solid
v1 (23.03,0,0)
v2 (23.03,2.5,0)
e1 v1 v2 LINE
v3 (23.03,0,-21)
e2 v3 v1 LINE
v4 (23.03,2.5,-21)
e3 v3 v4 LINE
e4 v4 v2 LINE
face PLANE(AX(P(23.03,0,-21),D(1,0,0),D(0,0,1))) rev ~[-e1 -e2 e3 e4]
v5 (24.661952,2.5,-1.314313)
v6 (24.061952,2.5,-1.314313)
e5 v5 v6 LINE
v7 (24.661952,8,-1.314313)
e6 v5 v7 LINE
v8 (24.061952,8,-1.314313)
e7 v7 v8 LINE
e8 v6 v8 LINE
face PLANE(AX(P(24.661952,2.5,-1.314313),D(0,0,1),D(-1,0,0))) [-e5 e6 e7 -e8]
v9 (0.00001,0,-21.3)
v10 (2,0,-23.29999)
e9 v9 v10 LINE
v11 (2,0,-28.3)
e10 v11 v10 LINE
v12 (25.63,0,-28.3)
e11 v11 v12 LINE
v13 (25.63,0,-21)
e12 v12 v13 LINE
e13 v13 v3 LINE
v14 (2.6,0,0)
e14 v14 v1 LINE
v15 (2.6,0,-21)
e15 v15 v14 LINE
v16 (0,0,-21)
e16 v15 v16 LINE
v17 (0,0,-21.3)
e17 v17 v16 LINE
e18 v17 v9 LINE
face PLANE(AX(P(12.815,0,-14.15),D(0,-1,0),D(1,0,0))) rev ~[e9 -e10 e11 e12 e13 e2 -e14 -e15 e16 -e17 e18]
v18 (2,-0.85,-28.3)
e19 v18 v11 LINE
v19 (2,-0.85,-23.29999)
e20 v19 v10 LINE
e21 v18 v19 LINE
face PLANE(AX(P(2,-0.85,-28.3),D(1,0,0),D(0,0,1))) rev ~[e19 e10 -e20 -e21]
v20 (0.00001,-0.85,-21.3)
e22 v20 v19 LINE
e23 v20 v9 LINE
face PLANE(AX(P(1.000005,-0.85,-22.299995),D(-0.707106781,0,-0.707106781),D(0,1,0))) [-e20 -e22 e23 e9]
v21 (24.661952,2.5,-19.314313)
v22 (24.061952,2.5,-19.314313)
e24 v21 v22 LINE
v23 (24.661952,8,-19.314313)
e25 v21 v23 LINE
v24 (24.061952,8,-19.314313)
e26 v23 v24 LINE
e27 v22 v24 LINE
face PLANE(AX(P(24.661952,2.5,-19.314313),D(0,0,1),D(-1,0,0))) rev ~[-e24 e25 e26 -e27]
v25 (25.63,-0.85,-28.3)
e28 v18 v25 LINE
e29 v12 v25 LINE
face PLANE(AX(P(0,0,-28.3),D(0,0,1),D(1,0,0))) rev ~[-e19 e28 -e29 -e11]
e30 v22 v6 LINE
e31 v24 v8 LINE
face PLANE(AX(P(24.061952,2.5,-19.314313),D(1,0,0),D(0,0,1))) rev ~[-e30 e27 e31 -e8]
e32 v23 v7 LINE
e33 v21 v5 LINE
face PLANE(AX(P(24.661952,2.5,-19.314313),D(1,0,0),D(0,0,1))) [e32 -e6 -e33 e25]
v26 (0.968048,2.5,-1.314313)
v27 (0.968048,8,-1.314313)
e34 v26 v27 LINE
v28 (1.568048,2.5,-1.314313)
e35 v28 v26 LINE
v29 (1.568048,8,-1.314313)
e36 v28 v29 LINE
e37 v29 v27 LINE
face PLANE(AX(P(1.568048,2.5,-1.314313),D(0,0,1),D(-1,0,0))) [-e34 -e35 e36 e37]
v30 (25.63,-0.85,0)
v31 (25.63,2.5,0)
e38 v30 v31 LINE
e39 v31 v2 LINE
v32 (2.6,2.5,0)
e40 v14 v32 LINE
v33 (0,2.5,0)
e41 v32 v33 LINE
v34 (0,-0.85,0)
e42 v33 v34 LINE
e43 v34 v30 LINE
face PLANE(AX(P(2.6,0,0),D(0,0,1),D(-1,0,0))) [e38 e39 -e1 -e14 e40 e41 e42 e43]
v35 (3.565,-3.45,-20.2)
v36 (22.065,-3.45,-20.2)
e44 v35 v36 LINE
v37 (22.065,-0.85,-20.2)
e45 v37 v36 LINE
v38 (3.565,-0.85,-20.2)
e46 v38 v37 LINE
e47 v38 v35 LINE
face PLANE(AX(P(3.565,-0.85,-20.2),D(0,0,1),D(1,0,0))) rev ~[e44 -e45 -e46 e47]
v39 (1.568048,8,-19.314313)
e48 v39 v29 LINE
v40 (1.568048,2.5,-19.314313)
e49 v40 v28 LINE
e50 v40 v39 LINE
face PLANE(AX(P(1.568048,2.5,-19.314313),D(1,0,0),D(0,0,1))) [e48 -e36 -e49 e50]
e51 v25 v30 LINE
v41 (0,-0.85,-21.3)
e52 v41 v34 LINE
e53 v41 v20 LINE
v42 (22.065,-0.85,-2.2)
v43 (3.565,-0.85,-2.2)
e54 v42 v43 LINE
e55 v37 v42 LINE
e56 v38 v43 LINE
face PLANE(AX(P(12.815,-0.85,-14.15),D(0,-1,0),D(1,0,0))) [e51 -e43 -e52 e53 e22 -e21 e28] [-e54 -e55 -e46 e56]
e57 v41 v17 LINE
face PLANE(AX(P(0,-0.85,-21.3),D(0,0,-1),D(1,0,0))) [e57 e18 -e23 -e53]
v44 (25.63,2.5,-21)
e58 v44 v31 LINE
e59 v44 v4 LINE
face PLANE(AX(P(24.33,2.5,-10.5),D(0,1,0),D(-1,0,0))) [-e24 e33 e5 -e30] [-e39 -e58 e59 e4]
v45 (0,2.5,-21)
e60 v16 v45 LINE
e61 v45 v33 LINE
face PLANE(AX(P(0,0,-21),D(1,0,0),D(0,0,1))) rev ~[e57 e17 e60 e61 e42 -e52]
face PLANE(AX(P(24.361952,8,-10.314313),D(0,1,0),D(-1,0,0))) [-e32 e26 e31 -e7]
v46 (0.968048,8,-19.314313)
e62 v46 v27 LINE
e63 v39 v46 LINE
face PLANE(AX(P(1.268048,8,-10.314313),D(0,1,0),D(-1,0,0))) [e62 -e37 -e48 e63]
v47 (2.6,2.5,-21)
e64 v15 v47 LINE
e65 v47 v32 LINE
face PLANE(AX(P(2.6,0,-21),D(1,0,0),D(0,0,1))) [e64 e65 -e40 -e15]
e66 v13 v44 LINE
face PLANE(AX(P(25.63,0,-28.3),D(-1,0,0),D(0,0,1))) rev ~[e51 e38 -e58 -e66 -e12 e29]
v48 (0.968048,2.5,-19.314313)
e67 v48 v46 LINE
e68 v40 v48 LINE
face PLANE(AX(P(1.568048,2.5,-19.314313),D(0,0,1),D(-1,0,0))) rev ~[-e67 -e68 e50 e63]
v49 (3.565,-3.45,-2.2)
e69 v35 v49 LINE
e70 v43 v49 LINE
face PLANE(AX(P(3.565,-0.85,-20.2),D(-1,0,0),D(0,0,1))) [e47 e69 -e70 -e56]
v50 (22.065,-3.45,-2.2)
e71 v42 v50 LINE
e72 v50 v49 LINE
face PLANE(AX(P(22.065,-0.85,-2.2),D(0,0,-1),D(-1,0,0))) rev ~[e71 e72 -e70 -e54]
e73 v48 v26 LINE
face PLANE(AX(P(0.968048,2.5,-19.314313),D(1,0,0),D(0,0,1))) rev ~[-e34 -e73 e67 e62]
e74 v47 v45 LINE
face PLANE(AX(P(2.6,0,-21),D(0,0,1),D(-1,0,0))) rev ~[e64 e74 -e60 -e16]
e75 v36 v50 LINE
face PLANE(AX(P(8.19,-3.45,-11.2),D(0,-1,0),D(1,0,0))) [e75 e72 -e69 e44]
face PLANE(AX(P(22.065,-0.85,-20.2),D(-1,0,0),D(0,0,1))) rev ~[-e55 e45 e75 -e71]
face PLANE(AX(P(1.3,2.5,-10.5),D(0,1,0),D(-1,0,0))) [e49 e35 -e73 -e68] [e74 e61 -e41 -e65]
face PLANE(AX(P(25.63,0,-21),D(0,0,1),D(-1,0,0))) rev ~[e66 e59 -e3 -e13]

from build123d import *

# Parameters (mm, degrees)
F0_W      = 25.63
F0_H      = 28.3
F1_DEPTH  = 0.85
F2_W      = 9.25
F2_H      = 18
F3_DEPTH  = 2.6
F4_W      = 2
F4_H      = 7
F5_DEPTH  = 25
F6_SIZE   = 1.99999
F7_W      = 2.6
F7_H      = 21
F8_DEPTH  = 2.5
F9_W      = 0.6
F9_H      = 18
F10_DEPTH = 5.5


# Not quite as in the source:
# - a fillet or chamfer is up to 0.001 mm smaller than in the source, because OpenCascade refuses the exact size


with BuildPart() as f1:
    # F0 (on Front) → F1 (new body)
    with BuildSketch(Plane.XZ):
        with Locations((12.815, -14.15)):
            Rectangle(F0_W, F0_H)
    extrude(amount=F1_DEPTH)

    # F2 (on face) → F3 (join)
    with BuildSketch(Plane.XZ.offset(0.85)):
        with Locations((8.19, -11.2)):
            Rectangle(F2_W, F2_H)
        with Locations((17.44, -11.2)):
            Rectangle(F2_W, F2_H)
    extrude(amount=F3_DEPTH)

    # F4 (on face) → F5 (cut)
    with BuildSketch(Plane.XZ.offset(0.85)):
        with Locations((1, -24.8)):
            Rectangle(F4_W, F4_H)
    extrude(amount=-F5_DEPTH, mode=Mode.SUBTRACT)

    # F6 (size 2 in the source; OpenCascade refuses exactly that, so slightly less here)
    f6_edges = [f1.edges().sort_by_distance(p)[0] for p in [
        (2, -0.425, -21.3),
    ]]
    chamfer(f6_edges, length=F6_SIZE)

    # F7 (on face) → F8 (join)
    with BuildSketch(Plane(origin=(0, 0, 0), x_dir=(-1, 0, 0), z_dir=(0, 1, 0))):
        with Locations((-1.3, -10.5)):
            Rectangle(F7_W, F7_H)
        with Locations((-24.33, -10.5)):
            Rectangle(F7_W, F7_H)
    extrude(amount=F8_DEPTH)

    # F9 (on face) → F10 (join)
    with BuildSketch(Plane(origin=(0, 2.5, 0), x_dir=(-1, 0, 0), z_dir=(0, 1, 0))):
        with Locations((-1.2680477372, -10.3143126089)):
            Rectangle(F9_W, F9_H)
        with Locations((-24.3619522628, -10.3143126089)):
            Rectangle(F9_W, F9_H)
    extrude(amount=F10_DEPTH)


solid = f1.part
